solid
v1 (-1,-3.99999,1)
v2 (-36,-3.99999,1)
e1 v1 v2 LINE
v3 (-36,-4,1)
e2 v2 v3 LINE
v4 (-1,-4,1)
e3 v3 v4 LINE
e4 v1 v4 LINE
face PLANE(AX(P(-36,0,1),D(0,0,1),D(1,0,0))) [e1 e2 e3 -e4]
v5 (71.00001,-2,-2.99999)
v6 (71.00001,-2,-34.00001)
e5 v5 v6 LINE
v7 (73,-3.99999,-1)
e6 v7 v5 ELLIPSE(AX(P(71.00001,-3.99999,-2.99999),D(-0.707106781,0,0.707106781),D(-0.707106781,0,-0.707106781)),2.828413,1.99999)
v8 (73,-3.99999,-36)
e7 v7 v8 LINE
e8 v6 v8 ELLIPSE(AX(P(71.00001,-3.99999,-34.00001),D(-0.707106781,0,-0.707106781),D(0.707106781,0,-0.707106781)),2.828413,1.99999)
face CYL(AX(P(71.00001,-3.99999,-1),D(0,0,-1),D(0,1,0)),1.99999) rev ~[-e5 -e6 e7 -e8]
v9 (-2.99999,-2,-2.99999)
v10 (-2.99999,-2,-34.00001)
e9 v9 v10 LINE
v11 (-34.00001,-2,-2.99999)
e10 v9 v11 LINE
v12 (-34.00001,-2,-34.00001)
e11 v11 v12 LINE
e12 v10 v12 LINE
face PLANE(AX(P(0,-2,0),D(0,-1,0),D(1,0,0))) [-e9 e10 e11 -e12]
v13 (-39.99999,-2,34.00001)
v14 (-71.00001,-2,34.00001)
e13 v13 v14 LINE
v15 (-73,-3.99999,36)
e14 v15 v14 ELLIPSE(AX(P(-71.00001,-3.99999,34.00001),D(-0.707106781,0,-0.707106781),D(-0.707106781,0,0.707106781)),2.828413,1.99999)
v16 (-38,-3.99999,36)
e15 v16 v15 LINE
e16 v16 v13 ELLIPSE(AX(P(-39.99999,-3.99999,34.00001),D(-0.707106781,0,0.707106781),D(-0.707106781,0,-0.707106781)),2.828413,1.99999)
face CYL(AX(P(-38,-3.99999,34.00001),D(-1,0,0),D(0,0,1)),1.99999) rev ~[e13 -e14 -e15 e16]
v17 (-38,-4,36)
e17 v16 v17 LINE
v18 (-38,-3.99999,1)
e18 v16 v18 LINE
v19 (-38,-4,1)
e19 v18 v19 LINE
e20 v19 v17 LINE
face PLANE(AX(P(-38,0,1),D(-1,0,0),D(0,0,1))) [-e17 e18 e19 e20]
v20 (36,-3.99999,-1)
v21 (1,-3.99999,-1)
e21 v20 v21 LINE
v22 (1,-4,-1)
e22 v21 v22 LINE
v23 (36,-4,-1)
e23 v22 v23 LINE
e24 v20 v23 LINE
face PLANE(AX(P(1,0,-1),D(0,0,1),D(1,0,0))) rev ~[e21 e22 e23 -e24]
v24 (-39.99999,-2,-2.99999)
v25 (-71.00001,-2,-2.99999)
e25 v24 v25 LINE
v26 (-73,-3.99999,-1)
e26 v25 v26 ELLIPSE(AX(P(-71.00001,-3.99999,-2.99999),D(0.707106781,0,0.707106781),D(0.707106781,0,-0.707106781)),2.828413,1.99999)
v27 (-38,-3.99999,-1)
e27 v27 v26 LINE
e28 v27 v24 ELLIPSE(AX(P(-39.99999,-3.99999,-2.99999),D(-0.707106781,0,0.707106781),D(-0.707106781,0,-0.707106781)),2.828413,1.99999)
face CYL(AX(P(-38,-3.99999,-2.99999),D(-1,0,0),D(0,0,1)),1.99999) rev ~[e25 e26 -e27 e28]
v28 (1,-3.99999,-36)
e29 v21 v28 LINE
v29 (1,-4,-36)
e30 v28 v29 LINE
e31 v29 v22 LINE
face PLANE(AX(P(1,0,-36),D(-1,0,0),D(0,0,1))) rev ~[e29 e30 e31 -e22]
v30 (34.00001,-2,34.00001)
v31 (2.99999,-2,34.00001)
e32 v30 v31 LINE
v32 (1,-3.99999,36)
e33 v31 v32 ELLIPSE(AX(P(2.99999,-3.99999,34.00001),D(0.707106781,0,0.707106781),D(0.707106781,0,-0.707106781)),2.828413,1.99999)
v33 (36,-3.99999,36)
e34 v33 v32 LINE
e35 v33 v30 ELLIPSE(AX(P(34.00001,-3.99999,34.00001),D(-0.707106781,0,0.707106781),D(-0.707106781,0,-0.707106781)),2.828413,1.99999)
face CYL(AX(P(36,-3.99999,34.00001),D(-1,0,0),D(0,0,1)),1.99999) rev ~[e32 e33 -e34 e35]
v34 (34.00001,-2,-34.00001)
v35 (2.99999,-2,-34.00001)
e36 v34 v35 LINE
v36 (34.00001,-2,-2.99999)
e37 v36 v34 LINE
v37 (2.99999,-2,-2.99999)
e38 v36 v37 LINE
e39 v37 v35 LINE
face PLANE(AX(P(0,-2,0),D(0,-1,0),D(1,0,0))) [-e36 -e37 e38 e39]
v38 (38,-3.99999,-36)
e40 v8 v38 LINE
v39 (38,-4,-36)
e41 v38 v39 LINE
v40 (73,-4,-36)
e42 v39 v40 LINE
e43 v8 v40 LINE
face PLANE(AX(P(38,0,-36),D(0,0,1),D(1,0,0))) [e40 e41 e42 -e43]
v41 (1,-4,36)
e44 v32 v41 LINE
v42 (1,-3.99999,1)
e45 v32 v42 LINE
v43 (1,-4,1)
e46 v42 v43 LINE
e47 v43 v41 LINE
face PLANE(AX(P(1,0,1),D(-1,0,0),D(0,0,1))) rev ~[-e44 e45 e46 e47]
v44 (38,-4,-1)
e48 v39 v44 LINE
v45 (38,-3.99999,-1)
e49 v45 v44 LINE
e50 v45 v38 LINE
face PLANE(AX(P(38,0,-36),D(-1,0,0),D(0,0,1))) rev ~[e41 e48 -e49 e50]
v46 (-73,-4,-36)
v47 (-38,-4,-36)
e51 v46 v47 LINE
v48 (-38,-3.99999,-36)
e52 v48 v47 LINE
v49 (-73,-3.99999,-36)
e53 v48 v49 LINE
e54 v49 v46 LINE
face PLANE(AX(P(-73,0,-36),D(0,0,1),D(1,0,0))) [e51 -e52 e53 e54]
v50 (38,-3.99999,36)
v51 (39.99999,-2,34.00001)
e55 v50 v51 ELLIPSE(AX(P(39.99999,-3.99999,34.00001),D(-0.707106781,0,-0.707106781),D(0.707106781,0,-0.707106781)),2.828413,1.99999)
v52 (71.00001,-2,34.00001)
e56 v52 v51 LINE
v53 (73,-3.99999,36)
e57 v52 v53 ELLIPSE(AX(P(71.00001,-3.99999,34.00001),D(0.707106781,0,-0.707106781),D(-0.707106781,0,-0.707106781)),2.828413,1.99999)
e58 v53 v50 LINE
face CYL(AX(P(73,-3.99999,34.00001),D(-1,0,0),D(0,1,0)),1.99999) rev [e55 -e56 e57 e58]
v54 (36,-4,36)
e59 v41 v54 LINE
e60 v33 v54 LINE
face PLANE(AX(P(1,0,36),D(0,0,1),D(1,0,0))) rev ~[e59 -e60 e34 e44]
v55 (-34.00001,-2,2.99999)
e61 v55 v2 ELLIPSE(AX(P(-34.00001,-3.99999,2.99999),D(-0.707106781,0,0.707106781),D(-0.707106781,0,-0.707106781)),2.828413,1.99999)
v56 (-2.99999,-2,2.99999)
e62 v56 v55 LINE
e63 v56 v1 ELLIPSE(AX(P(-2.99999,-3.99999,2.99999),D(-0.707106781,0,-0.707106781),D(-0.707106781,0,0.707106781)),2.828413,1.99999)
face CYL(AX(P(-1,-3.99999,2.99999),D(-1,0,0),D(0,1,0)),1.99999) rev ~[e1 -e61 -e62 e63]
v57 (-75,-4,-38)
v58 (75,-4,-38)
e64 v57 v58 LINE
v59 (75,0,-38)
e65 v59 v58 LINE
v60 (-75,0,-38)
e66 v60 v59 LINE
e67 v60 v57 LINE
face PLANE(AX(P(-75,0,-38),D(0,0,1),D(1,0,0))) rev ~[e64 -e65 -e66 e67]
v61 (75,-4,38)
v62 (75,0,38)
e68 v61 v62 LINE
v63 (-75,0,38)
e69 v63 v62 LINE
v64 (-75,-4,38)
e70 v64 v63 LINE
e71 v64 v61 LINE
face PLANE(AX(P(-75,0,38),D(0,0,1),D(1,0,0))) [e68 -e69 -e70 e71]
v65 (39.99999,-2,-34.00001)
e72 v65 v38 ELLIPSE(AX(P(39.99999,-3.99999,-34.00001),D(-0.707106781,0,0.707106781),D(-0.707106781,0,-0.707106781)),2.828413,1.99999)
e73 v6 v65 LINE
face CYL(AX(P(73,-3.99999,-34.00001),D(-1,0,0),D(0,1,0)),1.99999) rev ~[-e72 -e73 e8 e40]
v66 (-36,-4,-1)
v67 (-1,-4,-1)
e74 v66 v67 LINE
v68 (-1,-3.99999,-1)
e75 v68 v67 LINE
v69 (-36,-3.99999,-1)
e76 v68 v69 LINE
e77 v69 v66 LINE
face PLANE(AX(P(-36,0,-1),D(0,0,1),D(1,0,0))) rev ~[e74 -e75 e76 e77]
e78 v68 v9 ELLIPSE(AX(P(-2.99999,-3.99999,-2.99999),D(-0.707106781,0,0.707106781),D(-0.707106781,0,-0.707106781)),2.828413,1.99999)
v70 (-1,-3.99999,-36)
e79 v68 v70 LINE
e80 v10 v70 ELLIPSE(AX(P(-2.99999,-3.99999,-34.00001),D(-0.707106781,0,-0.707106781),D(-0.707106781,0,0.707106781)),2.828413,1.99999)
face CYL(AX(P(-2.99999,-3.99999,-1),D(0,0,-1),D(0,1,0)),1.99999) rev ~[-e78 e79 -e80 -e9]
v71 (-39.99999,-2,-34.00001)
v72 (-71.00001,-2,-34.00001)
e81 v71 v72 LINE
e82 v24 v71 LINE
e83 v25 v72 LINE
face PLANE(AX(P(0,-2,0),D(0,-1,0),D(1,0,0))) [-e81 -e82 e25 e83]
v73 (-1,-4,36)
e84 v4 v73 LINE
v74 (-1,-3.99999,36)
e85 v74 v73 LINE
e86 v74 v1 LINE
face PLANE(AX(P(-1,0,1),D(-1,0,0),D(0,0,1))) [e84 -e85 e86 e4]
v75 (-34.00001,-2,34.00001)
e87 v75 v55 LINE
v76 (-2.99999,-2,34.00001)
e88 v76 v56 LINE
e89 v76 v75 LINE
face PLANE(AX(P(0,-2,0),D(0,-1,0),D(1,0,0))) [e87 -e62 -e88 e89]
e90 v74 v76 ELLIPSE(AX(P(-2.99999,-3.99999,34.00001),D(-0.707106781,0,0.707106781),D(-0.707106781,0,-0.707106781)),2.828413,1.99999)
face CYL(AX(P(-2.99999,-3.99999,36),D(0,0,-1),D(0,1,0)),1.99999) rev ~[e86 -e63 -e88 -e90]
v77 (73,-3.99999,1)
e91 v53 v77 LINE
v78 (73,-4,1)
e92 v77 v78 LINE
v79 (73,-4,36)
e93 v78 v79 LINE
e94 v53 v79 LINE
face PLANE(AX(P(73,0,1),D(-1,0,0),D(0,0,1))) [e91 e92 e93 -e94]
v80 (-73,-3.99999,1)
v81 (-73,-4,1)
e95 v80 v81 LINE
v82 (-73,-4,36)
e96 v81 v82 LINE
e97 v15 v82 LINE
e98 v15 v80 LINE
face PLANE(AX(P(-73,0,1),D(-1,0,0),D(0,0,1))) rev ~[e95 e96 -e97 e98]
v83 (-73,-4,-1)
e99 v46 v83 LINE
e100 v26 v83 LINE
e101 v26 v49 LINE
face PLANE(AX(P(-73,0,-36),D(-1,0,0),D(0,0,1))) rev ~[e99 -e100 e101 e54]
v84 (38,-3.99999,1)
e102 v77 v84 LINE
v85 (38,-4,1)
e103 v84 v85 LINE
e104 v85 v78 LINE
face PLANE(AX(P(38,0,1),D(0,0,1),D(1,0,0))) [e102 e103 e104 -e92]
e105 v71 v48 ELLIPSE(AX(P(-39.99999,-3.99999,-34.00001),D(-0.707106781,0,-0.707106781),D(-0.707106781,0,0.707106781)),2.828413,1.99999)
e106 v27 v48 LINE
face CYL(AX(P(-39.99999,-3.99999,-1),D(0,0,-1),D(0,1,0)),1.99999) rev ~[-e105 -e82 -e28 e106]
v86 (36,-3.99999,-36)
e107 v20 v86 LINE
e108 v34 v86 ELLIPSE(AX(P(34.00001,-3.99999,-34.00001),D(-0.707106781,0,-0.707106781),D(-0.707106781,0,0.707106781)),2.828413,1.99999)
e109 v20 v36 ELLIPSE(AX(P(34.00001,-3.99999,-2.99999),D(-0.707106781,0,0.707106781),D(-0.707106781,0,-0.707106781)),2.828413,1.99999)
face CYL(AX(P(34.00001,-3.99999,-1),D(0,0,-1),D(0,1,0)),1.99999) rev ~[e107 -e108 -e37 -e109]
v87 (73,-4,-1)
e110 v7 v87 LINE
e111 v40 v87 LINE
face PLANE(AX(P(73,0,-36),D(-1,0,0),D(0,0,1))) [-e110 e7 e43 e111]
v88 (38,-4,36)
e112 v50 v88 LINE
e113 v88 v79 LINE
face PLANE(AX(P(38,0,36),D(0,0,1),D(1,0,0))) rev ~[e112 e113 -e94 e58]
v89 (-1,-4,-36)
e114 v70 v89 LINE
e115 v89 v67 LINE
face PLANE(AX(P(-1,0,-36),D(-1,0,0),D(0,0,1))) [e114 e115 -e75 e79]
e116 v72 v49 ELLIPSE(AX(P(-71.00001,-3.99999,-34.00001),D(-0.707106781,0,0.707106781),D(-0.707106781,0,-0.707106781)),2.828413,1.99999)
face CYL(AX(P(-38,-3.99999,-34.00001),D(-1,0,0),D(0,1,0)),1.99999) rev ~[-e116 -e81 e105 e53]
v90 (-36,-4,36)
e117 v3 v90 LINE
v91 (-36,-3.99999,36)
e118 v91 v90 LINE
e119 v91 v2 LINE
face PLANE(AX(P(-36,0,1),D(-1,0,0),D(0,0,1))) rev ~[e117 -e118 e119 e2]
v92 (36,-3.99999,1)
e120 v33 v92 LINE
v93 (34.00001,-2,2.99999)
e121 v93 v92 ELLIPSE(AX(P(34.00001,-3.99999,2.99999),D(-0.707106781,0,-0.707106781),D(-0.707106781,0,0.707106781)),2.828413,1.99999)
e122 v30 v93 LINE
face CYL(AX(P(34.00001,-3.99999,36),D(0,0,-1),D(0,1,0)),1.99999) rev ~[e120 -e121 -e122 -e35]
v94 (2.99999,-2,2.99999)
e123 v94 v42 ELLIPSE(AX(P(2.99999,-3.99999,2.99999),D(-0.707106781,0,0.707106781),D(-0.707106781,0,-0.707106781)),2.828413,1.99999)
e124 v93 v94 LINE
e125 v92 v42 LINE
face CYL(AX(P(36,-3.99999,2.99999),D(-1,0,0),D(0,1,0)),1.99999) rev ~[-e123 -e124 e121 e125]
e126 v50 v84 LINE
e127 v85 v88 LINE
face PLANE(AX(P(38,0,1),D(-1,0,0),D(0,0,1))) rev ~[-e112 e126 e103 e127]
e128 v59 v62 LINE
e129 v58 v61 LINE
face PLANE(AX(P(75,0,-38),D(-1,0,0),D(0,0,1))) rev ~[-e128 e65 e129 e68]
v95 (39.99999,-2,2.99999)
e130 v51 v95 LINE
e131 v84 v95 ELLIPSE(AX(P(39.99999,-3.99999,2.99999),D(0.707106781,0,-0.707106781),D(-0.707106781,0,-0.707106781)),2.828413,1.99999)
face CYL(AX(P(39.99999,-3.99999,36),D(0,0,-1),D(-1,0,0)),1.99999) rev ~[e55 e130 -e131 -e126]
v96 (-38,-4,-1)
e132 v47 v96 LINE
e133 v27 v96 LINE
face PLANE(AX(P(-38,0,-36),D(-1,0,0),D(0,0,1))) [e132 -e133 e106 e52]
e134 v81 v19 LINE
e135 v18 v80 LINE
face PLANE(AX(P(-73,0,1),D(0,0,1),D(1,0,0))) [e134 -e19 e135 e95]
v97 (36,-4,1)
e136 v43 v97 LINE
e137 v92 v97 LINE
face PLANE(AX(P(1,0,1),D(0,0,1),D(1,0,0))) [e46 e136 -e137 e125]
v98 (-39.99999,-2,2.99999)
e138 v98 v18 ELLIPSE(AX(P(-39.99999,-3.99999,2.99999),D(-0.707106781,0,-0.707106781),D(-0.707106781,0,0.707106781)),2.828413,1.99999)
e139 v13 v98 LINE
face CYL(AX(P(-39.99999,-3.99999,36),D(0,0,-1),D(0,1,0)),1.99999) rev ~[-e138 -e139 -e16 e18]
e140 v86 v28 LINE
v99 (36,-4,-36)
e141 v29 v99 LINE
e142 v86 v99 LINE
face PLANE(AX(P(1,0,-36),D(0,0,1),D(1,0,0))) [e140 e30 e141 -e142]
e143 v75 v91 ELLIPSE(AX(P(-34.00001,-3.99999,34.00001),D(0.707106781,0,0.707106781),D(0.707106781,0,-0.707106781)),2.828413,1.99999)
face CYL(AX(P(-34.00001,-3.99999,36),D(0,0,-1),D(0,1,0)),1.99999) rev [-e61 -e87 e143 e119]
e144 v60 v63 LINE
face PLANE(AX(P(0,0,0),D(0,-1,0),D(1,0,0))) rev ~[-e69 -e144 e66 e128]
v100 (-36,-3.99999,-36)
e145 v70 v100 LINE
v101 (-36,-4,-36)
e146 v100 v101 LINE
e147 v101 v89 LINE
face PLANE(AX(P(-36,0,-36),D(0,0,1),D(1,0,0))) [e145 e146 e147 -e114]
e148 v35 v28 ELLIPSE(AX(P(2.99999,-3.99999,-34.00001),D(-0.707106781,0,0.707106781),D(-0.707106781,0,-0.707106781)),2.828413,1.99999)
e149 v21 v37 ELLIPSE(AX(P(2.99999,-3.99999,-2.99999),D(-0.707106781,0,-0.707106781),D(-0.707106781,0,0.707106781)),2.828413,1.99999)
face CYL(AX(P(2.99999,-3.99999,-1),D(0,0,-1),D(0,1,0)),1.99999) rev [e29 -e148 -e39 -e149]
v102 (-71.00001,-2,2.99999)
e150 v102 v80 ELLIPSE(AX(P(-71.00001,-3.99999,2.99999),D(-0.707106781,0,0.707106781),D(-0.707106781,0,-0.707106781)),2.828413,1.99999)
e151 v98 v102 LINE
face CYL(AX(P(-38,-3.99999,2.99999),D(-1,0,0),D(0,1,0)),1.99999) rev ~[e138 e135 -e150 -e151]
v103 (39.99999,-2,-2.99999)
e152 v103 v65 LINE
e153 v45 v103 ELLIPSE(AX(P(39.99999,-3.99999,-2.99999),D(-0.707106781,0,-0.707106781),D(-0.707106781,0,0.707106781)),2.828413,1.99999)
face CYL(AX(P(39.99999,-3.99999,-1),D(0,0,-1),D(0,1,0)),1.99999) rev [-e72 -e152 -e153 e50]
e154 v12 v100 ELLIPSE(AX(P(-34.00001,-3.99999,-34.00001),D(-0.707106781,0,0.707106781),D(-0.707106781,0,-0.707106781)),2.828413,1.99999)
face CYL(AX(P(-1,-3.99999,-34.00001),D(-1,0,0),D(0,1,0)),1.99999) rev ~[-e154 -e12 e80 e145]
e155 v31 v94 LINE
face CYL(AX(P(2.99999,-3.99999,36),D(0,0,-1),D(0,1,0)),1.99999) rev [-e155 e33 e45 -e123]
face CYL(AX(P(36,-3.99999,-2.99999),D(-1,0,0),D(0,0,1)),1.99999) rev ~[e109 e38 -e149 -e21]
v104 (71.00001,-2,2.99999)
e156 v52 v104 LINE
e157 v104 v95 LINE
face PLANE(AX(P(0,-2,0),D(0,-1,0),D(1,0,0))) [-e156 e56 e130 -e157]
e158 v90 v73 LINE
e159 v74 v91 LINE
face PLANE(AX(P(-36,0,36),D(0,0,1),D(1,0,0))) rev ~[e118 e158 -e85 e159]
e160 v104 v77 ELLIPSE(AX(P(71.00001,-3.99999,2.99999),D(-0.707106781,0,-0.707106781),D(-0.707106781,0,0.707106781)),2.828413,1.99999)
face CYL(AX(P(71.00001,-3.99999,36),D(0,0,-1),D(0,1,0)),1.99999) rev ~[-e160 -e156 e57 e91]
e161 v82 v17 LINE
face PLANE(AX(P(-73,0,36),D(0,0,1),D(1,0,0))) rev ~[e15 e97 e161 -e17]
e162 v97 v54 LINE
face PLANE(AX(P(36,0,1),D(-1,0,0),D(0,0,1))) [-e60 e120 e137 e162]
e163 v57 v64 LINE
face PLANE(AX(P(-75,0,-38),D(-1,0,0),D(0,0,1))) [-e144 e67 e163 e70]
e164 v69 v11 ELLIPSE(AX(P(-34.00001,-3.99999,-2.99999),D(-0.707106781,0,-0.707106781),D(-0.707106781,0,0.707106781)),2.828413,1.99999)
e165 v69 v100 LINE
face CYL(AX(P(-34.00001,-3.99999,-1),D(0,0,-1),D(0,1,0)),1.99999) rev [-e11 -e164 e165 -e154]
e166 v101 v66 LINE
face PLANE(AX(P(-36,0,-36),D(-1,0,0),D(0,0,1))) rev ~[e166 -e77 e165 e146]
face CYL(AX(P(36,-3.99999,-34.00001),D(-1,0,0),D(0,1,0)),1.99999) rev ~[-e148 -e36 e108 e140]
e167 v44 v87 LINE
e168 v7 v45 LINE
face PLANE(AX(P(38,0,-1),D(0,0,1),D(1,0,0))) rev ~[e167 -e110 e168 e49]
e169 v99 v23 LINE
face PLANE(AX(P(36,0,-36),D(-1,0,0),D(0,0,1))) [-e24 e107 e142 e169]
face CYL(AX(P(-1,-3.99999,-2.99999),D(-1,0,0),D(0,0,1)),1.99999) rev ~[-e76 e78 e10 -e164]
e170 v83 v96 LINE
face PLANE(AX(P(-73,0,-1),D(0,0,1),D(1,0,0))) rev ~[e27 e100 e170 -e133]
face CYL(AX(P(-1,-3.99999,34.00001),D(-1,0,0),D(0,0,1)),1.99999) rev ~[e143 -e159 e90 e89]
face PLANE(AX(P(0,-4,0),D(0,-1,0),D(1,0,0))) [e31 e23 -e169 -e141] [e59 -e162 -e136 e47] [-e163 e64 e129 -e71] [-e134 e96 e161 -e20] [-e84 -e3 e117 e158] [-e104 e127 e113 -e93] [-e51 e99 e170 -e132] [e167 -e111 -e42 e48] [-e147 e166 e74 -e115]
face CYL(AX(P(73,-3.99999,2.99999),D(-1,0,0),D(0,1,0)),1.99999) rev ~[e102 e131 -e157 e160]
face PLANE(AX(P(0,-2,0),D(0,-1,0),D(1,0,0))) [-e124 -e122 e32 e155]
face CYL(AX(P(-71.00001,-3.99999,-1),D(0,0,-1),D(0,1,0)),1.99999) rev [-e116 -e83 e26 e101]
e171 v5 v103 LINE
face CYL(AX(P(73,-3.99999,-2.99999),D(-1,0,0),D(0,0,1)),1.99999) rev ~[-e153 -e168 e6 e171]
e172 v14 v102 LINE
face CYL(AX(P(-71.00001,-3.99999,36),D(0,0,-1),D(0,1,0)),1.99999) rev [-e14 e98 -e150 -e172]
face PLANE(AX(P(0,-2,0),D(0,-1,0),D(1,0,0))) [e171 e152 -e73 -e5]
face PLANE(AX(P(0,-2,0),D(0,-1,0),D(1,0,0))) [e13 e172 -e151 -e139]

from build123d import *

# Parameters (mm, degrees)
F0_W     = 150
F0_H     = 76
F0_W_2   = 35
F0_H_2   = 35
F1_DEPTH = 2
F2_DEPTH = 4
F3_R     = 1.99999


# Not quite as in the source:
# - a fillet or chamfer is up to 0.001 mm smaller than in the source, because OpenCascade refuses the exact size


with BuildPart() as f1:
    # F0 (on Front) → F1 (new body)
    with BuildSketch(Plane.XZ):
        Rectangle(F0_W, F0_H)
        with Locations((-55.5, -18.5)):
            Rectangle(F0_W_2, F0_H_2, mode=Mode.SUBTRACT)
        with Locations((-18.5, -18.5)):
            Rectangle(F0_W_2, F0_H_2, mode=Mode.SUBTRACT)
        with Locations((18.5, -18.5)):
            Rectangle(F0_W_2, F0_H_2, mode=Mode.SUBTRACT)
        with Locations((55.5, -18.5)):
            Rectangle(F0_W_2, F0_H_2, mode=Mode.SUBTRACT)
        with Locations((-55.5, 18.5)):
            Rectangle(F0_W_2, F0_H_2, mode=Mode.SUBTRACT)
        with Locations((-18.5, 18.5)):
            Rectangle(F0_W_2, F0_H_2, mode=Mode.SUBTRACT)
        with Locations((18.5, 18.5)):
            Rectangle(F0_W_2, F0_H_2, mode=Mode.SUBTRACT)
        with Locations((55.5, 18.5)):
            Rectangle(F0_W_2, F0_H_2, mode=Mode.SUBTRACT)
        with Locations((-55.5, -18.5)):
            Rectangle(F0_W_2, F0_H_2)
        with Locations((-55.5, 18.5)):
            Rectangle(F0_W_2, F0_H_2)
        with Locations((-18.5, 18.5)):
            Rectangle(F0_W_2, F0_H_2)
        with Locations((18.5, 18.5)):
            Rectangle(F0_W_2, F0_H_2)
        with Locations((55.5, -18.5)):
            Rectangle(F0_W_2, F0_H_2)
        with Locations((55.5, 18.5)):
            Rectangle(F0_W_2, F0_H_2)
        with Locations((18.5, -18.5)):
            Rectangle(F0_W_2, F0_H_2)
        with Locations((-18.5, -18.5)):
            Rectangle(F0_W_2, F0_H_2)
    extrude(amount=F1_DEPTH)

    # F0 (on Front) → F2 (join)
    with BuildSketch(Plane.XZ):
        Rectangle(F0_W, F0_H)
        with Locations((-55.5, -18.5)):
            Rectangle(F0_W_2, F0_H_2, mode=Mode.SUBTRACT)
        with Locations((-18.5, -18.5)):
            Rectangle(F0_W_2, F0_H_2, mode=Mode.SUBTRACT)
        with Locations((18.5, -18.5)):
            Rectangle(F0_W_2, F0_H_2, mode=Mode.SUBTRACT)
        with Locations((55.5, -18.5)):
            Rectangle(F0_W_2, F0_H_2, mode=Mode.SUBTRACT)
        with Locations((-55.5, 18.5)):
            Rectangle(F0_W_2, F0_H_2, mode=Mode.SUBTRACT)
        with Locations((-18.5, 18.5)):
            Rectangle(F0_W_2, F0_H_2, mode=Mode.SUBTRACT)
        with Locations((18.5, 18.5)):
            Rectangle(F0_W_2, F0_H_2, mode=Mode.SUBTRACT)
        with Locations((55.5, 18.5)):
            Rectangle(F0_W_2, F0_H_2, mode=Mode.SUBTRACT)
    extrude(amount=F2_DEPTH)

    # F3 (radius 2 in the source; OpenCascade refuses exactly that, so slightly less here)
    f3_edges = [f1.edges().sort_by_distance(p)[0] for p in [
        (-73, -2, -18.5),
        (-55.5, -2, -1),
        (-55.5, -2, 36),
        (-36, -2, 18.5),
        (-18.5, -2, 36),
        (-73, -2, 18.5),
        (1, -2, 18.5),
        (18.5, -2, 36),
        (38, -2, 18.5),
        (55.5, -2, 36),
        (55.5, -2, -1),
        (38, -2, -18.5),
        (18.5, -2, -1),
        (1, -2, -18.5),
        (-18.5, -2, -1),
        (-36, -2, -18.5),
        (73, -2, -18.5),
        (55.5, -2, -36),
        (18.5, -2, -36),
        (-18.5, -2, -36),
        (-55.5, -2, -36),
        (-38, -2, -18.5),
        (-1, -2, -18.5),
        (36, -2, -18.5),
        (55.5, -2, 1),
        (73, -2, 18.5),
        (18.5, -2, 1),
        (36, -2, 18.5),
        (-18.5, -2, 1),
        (-1, -2, 18.5),
        (-55.5, -2, 1),
        (-38, -2, 18.5),
    ]]
    fillet(f3_edges, radius=F3_R)


solid = f1.part
